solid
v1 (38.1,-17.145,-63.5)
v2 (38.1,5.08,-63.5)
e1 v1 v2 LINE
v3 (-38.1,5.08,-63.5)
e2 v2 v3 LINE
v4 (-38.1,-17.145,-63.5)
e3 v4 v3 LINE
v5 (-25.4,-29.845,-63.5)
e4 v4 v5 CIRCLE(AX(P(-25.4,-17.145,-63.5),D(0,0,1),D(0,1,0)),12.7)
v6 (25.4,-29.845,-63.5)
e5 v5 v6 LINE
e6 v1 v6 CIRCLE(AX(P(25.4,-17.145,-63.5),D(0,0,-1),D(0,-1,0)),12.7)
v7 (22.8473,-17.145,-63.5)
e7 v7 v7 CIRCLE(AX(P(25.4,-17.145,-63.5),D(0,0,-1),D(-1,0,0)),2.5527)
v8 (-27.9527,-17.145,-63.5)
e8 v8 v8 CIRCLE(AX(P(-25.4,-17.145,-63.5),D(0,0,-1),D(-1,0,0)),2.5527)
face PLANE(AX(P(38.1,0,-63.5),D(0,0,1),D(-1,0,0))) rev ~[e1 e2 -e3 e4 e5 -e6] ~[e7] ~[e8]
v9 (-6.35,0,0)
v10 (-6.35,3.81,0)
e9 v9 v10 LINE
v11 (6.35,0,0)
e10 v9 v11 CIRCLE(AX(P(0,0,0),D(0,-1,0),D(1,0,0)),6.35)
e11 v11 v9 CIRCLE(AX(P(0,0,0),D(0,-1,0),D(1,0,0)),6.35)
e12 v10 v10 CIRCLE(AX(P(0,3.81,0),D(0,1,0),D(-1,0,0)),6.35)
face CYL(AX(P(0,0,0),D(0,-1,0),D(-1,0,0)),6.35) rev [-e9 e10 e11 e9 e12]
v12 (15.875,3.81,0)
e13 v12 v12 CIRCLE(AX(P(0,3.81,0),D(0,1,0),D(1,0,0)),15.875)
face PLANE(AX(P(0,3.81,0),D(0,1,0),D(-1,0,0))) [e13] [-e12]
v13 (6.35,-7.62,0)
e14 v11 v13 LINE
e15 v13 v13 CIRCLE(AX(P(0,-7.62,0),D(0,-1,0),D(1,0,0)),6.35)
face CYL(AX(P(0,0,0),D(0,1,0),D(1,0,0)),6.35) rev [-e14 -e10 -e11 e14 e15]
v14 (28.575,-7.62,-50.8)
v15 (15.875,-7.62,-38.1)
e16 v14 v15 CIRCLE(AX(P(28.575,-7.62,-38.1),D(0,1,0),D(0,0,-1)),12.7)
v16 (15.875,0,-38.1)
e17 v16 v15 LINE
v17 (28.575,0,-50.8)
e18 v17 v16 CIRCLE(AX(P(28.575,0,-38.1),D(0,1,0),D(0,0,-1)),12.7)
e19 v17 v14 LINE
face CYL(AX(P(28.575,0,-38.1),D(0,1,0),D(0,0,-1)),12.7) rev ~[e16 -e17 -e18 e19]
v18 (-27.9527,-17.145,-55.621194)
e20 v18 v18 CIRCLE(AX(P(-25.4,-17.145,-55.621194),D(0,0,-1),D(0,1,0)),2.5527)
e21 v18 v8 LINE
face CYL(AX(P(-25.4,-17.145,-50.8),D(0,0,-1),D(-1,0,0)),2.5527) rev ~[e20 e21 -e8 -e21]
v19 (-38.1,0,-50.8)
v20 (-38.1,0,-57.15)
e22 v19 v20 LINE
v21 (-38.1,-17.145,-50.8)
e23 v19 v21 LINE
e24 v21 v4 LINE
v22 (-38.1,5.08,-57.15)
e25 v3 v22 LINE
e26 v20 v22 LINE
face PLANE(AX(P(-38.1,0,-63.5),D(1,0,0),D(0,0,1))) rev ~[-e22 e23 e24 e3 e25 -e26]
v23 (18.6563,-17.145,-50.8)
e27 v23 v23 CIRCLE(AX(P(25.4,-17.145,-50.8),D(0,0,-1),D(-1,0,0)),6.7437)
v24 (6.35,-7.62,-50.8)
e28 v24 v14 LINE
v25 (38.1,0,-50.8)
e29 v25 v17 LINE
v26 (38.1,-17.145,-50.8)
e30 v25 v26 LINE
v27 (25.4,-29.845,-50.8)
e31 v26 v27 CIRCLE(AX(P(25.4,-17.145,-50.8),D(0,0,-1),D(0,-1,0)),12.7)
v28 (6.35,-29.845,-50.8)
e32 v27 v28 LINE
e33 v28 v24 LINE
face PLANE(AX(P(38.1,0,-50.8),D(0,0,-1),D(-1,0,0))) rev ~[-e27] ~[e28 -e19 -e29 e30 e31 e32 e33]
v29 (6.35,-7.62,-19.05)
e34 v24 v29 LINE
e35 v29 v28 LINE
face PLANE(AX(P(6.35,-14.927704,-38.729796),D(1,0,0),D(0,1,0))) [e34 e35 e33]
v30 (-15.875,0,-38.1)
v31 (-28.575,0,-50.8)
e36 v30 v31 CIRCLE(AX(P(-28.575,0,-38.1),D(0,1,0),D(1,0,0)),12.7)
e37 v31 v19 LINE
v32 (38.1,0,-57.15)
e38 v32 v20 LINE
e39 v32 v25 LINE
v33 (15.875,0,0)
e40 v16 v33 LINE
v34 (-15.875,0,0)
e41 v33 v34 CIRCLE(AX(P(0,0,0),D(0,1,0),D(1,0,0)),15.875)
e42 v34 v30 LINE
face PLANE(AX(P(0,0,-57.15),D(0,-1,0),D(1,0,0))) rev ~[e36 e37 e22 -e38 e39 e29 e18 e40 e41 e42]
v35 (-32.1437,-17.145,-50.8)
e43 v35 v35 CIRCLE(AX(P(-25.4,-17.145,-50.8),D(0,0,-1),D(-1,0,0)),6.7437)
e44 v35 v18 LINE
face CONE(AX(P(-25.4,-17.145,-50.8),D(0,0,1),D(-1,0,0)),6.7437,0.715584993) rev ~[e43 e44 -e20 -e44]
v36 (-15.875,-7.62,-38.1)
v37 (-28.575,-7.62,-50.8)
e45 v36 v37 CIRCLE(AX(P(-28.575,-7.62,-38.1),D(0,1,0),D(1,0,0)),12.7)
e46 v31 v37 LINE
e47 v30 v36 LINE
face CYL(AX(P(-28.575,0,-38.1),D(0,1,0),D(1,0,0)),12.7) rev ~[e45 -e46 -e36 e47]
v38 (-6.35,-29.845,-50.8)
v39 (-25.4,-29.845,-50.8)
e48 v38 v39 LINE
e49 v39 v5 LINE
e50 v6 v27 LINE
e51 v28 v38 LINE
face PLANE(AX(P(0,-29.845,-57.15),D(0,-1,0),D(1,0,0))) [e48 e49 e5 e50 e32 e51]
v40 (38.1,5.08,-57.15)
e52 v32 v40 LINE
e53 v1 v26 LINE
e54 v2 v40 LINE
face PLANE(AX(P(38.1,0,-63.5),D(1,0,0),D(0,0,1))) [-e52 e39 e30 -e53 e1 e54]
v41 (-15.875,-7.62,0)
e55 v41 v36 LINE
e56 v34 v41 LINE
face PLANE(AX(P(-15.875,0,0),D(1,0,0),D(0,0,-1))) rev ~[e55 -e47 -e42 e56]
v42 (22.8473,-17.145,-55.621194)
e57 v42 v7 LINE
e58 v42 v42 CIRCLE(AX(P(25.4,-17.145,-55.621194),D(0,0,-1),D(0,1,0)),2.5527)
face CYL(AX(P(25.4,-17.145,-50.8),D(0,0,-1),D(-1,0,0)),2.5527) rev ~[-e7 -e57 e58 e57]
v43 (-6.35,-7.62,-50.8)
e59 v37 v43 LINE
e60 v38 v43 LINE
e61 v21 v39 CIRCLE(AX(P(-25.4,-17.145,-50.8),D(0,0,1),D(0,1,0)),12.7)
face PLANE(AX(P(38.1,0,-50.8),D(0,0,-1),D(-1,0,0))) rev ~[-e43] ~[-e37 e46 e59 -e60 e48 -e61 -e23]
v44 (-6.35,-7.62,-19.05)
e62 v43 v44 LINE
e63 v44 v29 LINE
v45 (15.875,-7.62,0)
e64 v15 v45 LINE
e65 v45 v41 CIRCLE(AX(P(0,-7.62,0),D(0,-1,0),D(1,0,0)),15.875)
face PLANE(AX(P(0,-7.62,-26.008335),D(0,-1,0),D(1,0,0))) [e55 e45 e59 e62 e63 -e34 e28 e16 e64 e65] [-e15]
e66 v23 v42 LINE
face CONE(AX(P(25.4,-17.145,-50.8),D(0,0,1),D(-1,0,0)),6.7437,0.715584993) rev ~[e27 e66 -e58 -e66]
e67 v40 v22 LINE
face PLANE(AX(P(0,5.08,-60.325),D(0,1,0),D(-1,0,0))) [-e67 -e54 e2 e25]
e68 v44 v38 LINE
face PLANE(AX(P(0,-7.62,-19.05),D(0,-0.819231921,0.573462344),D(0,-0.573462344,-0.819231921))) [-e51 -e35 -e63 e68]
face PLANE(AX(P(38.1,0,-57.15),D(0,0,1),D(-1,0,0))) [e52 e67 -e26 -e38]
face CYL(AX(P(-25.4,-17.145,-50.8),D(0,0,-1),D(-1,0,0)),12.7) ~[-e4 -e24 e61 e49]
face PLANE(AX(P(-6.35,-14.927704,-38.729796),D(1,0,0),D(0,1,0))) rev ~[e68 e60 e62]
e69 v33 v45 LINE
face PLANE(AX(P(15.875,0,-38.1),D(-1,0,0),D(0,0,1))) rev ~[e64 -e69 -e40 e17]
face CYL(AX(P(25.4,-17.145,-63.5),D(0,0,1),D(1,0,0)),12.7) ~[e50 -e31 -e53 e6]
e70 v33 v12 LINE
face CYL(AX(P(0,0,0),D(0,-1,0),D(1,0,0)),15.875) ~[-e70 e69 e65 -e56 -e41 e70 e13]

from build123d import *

# Parameters (mm, degrees)
F1_DEPTH        = 29.845
F0_R            = 6.35
F2_DEPTH        = 7.62
F3_W            = 76.2
F3_H            = 6.35
F4_DEPTH        = 5.08
F5_R            = 6.35
F6_DEPTH        = 3.81
F8_DEPTH        = 6.35
F9_R            = 12.7
F11_D           = 5.1054
F11_CSINK_D     = 13.4874
F11_CSINK_ANGLE = 82


with BuildPart() as f1:
    # F0 (on Front) → F1 (new body)
    with BuildSketch(Plane.XZ):
        Polygon((38.1, -50.8), (28.575, -50.8), (-28.575, -50.8), (-38.1, -50.8), (-38.1, -63.5), (38.1, -63.5), align=None)
    extrude(amount=F1_DEPTH)

    # F0 (on Front) → F2 (join)
    with BuildSketch(Plane.XZ):
        with BuildLine():
            Line((15.875, -38.1), (15.875, 0))
            ThreePointArc((15.875, 0), (0, 15.875), (-15.875, 0))
            Line((-15.875, 0), (-15.875, -38.1))
            ThreePointArc((-15.875, -38.1), (-19.5947438789, -47.0802561211), (-28.575, -50.8))
            Line((-28.575, -50.8), (28.575, -50.8))
            ThreePointArc((28.575, -50.8), (19.5947438789, -47.0802561211), (15.875, -38.1))
        make_face()
        Circle(F0_R, mode=Mode.SUBTRACT)
    extrude(amount=F2_DEPTH)

    # F3 (on face) → F4 (join)
    with BuildSketch(Plane(origin=(0, 0, 0), x_dir=(-1, 0, 0), z_dir=(0, 1, 0))):
        with Locations((0, -60.325)):
            Rectangle(F3_W, F3_H)
    extrude(amount=F4_DEPTH)

    # F5 (on face) → F6 (join)
    with BuildSketch(Plane(origin=(0, 0, 0), x_dir=(-1, 0, 0), z_dir=(0, 1, 0))):
        with BuildLine():
            ThreePointArc((15.875, 0), (0, 15.875), (-15.875, 0))
            ThreePointArc((-15.875, 0), (0, -15.875), (15.875, 0))
        make_face()
        Circle(F5_R, mode=Mode.SUBTRACT)
    extrude(amount=F6_DEPTH)

    # F7 (on Right) → F8 (join, symmetric)
    with BuildSketch(Plane.YZ):
        Polygon((-7.62, -50.8), (-7.62, -19.05), (-29.845, -50.8), align=None)
    extrude(amount=F8_DEPTH, both=True)

    # F9
    f9_edges = [f1.edges().sort_by_distance(p)[0] for p in [
        (-38.1, -29.845, -57.15),
        (38.1, -29.845, -57.15),
    ]]
    fillet(f9_edges, radius=F9_R)

    # F11 (through all)
    with Locations(Plane.XY.offset(-50.8)):
        with Locations((25.4, -17.145), (-25.4, -17.145)):
            CounterSinkHole(F11_D / 2, F11_CSINK_D / 2, counter_sink_angle=F11_CSINK_ANGLE)


solid = f1.part
